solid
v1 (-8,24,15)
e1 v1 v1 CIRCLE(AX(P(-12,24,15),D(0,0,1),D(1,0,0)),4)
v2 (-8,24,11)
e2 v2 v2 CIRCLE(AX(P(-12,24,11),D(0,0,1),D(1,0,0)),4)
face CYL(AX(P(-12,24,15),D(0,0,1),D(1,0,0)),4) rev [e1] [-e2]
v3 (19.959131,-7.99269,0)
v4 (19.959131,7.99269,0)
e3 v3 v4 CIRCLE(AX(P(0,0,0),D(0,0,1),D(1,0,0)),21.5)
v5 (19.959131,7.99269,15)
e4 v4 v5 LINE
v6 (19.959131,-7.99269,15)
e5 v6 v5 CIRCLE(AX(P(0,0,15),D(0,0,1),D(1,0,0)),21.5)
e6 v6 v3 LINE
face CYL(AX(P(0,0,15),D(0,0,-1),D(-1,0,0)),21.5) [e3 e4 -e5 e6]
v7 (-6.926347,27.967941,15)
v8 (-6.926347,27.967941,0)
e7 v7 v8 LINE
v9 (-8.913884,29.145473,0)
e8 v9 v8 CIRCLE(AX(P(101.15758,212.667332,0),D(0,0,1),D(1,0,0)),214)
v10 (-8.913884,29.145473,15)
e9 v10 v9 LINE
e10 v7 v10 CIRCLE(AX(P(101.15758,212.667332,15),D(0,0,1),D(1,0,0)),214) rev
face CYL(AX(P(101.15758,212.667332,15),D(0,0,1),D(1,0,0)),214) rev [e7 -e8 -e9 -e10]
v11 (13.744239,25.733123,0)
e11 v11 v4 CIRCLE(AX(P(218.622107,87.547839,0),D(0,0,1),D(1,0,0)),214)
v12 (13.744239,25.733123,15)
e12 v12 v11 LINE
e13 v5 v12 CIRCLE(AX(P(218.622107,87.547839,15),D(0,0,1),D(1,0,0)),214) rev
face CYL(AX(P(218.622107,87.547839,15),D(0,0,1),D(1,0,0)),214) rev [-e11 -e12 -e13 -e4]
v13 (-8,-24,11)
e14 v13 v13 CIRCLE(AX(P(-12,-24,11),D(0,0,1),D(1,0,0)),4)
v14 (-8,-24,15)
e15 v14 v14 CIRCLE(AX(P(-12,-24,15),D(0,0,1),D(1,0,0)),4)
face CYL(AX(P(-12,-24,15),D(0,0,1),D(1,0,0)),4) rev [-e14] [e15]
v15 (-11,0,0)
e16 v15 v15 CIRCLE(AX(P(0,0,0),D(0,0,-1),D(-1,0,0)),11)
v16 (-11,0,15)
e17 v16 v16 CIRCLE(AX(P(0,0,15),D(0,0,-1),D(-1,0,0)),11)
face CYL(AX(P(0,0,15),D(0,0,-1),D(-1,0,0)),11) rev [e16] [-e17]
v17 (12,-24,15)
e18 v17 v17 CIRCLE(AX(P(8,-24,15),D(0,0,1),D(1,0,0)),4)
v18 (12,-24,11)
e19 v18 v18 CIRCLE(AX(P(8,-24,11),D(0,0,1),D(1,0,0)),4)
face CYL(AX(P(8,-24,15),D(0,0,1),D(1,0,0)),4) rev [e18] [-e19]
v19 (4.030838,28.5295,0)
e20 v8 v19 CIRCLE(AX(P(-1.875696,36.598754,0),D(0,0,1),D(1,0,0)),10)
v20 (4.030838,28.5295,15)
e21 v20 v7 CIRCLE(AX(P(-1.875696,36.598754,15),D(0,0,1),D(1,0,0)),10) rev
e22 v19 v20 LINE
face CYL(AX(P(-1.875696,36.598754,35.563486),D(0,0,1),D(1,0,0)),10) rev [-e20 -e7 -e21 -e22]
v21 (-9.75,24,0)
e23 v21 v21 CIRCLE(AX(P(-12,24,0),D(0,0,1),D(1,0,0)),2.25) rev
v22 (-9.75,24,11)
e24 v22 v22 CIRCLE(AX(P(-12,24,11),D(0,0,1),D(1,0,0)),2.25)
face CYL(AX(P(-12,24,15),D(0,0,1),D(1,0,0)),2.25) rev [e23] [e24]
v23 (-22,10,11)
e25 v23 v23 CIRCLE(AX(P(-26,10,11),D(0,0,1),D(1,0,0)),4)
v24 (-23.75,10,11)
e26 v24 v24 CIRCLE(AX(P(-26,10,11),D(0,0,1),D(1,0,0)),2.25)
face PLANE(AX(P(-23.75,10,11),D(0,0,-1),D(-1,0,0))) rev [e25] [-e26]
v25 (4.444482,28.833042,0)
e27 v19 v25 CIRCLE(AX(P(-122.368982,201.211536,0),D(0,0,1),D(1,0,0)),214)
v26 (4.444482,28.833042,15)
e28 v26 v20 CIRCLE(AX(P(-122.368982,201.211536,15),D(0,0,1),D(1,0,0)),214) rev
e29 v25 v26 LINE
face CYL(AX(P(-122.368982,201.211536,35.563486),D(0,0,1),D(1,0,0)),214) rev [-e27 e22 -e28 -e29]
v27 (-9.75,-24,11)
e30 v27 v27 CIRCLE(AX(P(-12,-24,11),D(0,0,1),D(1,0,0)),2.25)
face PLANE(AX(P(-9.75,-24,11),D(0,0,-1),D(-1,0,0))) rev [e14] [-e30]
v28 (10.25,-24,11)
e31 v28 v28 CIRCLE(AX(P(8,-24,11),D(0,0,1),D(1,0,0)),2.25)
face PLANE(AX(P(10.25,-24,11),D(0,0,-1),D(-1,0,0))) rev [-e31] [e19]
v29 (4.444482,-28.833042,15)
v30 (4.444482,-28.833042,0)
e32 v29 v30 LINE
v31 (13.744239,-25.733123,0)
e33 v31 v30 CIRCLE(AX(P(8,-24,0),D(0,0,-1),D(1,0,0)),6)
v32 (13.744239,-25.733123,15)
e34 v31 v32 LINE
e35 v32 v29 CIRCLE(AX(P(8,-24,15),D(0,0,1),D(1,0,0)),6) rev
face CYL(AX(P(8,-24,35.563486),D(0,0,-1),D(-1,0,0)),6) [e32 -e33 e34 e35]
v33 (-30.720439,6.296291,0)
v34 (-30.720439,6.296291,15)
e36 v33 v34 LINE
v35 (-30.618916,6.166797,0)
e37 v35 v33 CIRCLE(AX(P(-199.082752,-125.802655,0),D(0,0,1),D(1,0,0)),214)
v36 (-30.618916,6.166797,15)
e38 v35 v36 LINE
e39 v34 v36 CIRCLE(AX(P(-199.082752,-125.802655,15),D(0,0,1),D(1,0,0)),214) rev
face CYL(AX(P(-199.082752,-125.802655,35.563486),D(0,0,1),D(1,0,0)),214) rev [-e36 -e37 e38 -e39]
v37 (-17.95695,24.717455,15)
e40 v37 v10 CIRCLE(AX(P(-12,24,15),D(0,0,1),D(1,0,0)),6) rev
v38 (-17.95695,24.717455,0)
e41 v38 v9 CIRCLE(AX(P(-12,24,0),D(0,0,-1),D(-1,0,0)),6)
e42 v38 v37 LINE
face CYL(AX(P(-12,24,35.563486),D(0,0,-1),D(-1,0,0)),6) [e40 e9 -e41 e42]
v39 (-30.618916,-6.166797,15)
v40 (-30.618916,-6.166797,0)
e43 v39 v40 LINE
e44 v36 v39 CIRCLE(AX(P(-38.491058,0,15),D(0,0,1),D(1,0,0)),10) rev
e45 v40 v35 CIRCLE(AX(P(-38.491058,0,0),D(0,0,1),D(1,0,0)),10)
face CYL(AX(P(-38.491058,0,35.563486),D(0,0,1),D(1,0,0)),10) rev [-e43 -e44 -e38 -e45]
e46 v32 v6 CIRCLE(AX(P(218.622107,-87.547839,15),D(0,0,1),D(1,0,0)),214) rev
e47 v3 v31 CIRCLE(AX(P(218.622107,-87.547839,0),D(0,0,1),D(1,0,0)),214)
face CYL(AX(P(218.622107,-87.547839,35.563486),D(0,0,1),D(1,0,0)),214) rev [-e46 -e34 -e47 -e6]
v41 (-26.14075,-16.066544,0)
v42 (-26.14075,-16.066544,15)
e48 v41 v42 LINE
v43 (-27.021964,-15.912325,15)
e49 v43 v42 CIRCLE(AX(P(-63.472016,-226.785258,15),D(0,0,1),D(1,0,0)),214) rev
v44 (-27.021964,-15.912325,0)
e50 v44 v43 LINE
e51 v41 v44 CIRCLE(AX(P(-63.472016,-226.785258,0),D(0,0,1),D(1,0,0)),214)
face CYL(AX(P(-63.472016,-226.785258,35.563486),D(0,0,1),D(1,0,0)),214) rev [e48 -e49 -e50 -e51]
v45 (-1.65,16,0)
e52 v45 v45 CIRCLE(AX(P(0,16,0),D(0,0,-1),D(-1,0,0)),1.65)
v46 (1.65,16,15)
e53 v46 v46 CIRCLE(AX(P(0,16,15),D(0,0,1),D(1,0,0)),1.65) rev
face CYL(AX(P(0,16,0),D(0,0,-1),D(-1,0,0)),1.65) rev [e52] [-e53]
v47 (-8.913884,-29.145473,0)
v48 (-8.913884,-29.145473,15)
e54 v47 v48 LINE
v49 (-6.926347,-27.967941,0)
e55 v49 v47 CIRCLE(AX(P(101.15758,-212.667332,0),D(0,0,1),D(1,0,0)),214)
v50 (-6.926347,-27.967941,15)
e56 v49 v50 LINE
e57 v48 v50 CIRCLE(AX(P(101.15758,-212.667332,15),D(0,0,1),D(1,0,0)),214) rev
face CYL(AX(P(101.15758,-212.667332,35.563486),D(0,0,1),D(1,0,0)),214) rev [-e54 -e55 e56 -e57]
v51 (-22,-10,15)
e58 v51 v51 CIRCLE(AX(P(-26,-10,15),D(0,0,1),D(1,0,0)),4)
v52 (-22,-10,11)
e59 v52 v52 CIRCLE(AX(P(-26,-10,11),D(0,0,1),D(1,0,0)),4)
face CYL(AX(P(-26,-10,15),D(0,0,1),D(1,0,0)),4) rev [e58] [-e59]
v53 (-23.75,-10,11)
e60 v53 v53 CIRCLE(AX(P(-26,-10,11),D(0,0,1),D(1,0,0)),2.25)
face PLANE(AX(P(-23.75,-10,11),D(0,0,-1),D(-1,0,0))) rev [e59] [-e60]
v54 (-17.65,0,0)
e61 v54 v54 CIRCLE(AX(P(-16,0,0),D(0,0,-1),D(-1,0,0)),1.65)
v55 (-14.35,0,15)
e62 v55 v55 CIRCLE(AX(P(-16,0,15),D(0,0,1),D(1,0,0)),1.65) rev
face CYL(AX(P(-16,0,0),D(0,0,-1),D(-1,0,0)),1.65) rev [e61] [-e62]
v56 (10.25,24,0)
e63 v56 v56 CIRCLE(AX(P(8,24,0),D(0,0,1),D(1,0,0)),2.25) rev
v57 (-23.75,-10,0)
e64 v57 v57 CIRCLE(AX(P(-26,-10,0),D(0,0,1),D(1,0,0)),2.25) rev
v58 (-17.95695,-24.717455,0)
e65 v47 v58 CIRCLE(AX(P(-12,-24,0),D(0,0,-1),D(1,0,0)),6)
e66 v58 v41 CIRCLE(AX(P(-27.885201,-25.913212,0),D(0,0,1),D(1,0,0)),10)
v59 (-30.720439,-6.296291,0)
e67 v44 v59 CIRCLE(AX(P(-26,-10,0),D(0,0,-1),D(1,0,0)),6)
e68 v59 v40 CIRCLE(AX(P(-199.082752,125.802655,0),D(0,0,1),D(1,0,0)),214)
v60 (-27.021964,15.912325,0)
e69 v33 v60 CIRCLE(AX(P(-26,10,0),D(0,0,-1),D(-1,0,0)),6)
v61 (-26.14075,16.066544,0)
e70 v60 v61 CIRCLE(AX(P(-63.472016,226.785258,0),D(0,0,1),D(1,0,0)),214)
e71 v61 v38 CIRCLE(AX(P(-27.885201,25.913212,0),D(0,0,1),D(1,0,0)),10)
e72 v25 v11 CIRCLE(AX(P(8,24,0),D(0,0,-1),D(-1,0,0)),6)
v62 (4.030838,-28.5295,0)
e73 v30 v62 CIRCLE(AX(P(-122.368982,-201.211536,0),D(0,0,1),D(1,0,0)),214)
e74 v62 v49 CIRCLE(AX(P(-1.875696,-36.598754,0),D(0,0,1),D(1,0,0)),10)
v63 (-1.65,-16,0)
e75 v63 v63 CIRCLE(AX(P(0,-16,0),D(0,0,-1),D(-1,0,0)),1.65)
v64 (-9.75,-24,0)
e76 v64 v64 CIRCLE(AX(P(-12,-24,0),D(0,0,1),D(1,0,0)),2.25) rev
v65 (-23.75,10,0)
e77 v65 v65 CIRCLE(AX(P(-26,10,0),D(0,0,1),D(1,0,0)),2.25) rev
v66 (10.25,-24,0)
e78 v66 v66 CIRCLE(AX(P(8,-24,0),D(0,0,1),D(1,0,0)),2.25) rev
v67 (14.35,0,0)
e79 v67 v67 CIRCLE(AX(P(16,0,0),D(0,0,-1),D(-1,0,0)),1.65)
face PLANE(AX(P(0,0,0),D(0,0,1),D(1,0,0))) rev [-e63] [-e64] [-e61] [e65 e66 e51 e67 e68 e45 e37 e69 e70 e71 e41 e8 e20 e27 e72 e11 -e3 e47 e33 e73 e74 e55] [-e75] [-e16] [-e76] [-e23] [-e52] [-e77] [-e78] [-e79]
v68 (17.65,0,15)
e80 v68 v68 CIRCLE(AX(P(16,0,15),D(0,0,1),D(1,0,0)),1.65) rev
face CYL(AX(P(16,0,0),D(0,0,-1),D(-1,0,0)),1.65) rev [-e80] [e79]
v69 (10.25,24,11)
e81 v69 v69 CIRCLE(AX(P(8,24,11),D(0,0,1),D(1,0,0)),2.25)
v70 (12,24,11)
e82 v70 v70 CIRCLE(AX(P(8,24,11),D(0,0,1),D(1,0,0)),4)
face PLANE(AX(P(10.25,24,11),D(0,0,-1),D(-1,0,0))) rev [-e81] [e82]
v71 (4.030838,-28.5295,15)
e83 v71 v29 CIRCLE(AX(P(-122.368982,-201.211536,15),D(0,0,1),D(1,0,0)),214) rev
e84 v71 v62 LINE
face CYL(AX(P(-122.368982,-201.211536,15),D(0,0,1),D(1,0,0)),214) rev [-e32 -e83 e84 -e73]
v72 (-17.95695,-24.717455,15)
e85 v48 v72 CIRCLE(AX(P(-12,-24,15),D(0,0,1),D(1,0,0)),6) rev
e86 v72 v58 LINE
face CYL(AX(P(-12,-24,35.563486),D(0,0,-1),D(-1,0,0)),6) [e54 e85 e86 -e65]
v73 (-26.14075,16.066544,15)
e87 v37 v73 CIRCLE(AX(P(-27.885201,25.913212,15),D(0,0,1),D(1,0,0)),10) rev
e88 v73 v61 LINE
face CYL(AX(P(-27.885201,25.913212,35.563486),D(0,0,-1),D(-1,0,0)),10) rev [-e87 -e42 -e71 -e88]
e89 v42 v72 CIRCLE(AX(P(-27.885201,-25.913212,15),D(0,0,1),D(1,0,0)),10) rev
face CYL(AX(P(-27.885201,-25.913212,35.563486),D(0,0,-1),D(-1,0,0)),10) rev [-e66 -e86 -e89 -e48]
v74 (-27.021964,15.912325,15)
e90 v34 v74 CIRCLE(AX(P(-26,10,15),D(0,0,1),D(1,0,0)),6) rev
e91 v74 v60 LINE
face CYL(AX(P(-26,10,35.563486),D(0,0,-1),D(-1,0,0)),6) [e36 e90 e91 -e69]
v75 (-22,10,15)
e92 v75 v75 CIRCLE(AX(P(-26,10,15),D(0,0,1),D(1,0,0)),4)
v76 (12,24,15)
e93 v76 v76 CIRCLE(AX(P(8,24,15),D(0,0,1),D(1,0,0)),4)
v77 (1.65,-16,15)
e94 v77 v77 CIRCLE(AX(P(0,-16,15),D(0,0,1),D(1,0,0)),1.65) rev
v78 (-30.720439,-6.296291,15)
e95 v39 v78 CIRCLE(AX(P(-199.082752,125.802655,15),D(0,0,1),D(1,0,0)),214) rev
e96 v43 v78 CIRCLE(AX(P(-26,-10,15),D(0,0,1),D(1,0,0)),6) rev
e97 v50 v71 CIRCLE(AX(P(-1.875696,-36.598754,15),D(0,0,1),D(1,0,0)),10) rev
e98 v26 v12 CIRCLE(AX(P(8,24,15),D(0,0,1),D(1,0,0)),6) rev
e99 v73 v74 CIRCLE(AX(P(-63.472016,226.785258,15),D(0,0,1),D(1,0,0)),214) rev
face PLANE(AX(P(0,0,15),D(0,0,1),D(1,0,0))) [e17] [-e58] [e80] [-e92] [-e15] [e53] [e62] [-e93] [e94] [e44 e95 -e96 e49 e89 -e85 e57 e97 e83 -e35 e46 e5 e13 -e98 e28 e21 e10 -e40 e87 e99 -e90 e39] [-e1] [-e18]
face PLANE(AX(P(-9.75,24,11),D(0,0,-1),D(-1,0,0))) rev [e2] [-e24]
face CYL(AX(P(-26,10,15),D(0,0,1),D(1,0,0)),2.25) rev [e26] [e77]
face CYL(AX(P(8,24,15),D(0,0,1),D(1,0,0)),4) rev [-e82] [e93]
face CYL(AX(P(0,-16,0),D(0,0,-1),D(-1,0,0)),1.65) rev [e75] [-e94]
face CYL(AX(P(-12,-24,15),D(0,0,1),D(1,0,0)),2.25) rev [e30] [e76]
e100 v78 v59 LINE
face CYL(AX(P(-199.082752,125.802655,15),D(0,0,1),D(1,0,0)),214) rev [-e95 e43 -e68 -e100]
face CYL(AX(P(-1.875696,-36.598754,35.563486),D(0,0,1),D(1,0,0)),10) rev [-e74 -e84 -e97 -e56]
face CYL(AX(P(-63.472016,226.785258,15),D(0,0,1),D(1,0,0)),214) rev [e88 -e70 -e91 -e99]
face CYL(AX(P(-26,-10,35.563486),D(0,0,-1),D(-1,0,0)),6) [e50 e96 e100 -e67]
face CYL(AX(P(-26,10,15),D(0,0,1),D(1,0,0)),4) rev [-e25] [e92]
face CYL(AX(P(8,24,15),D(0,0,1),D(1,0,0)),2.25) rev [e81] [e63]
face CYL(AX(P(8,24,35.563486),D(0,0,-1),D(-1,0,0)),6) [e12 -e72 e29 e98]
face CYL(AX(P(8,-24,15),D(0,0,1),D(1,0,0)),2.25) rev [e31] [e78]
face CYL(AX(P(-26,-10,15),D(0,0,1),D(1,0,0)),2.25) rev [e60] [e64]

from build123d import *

# Parameters (mm, degrees)
SKETCH1_R                      = 21.5
BOSS_EXTRUDE1_DEPTH            = 15
TAP_DRILL_FOR_M4X0_7_TAP1_D    = 3.3
BOSS_EXTRUDE2_DEPTH            = 15
SKETCH6_R                      = 11
CUT_EXTRUDE1_DEPTH             = 47.357307946
FILLET1_DEPTH                  = 15
FILLET2_R                      = 10
CBORE_FOR_M4_SHCS2_D           = 4.5
CBORE_FOR_M4_SHCS2_CBORE_D     = 8
CBORE_FOR_M4_SHCS2_CBORE_DEPTH = 4


with BuildPart() as part:
    # Sketch1 → Boss-Extrude1 (new body)
    with BuildSketch(Plane.XY):
        Circle(SKETCH1_R)
    extrude(amount=BOSS_EXTRUDE1_DEPTH)

    # Tap Drill for M4x0.7 Tap1 (through all)
    with Locations(Plane(origin=(0, 0, 0), x_dir=(-1, 0, 0), z_dir=(0, 0, -1))):
        with Locations((0, 16), (16, 0), (0, -16), (-16, 0)):
            Hole(TAP_DRILL_FOR_M4X0_7_TAP1_D / 2)

    # Sketch3 → Boss-Extrude2 (add)
    with BuildSketch(Plane(origin=(0, 0, 0), x_dir=(-1, 0, 0), z_dir=(0, 0, -1))):
        with BuildLine():
            Line((-2.307900214, 25.897366597), (-0.836682642, 21.483713882))
            ThreePointArc((-0.836682642, 21.483713882), (-6.798896971, 20.396690908), (-12.220882218, 17.688980689))
            Line((-12.220882218, 17.688980689), (-13.69209979, 22.102633403))
            ThreePointArc((-13.69209979, 22.102633403), (-9.897366599, 29.692099788), (-2.307900214, 25.897366597))
        make_face()
        with BuildLine():
            Line((17.366563149, 21.316718426), (14.599655804, 15.782903738))
            ThreePointArc((14.599655804, 15.782903738), (9.615092305, 19.230184606), (3.866529512, 21.149466885))
            Line((3.866529512, 21.149466885), (6.633436857, 26.683281574))
            ThreePointArc((6.633436857, 26.683281574), (14.683281576, 29.366563146), (17.366563149, 21.316718426))
        make_face()
        with BuildLine():
            Line((23.846125524, 15.600073637), (17.115813542, 13.011492105))
            ThreePointArc((17.115813542, 13.011492105), (20.066930533, 7.718050205), (21.423562493, 1.811344831))
            Line((21.423562493, 1.811344831), (28.153874476, 4.399926363))
            ThreePointArc((28.153874476, 4.399926363), (31.600073637, 12.153874476), (23.846125524, 15.600073637))
        make_face()
        with BuildLine():
            Line((23.846125524, -15.600073637), (17.115813542, -13.011492105))
            ThreePointArc((17.115813542, -13.011492105), (20.066930533, -7.718050205), (21.423562493, -1.811344831))
            Line((21.423562493, -1.811344831), (28.153874476, -4.399926363))
            ThreePointArc((28.153874476, -4.399926363), (31.600073637, -12.153874476), (23.846125524, -15.600073637))
        make_face()
        with BuildLine():
            Line((17.366563149, -21.316718426), (14.599655804, -15.782903738))
            ThreePointArc((14.599655804, -15.782903738), (9.615092305, -19.230184606), (3.866529512, -21.149466885))
            Line((3.866529512, -21.149466885), (6.633436857, -26.683281574))
            ThreePointArc((6.633436857, -26.683281574), (14.683281576, -29.366563146), (17.366563149, -21.316718426))
        make_face()
        with BuildLine():
            Line((-2.307900214, -25.897366597), (-0.836682642, -21.483713882))
            ThreePointArc((-0.836682642, -21.483713882), (-6.798896971, -20.396690908), (-12.220882218, -17.688980689))
            Line((-12.220882218, -17.688980689), (-13.69209979, -22.102633403))
            ThreePointArc((-13.69209979, -22.102633403), (-9.897366599, -29.692099788), (-2.307900214, -25.897366597))
        make_face()
    extrude(amount=-BOSS_EXTRUDE2_DEPTH)

    # Sketch6 → Cut-Extrude1 (cut, through all)
    with BuildSketch(Plane(origin=(0, 0, 0), x_dir=(-1, 0, 0), z_dir=(0, 0, -1))):
        Circle(SKETCH6_R)
    extrude(amount=-CUT_EXTRUDE1_DEPTH, mode=Mode.SUBTRACT)

    # Fillet1: read off the stored shape, not the designer's step
    # Fillet1 outline → Fillet1 (add)
    with BuildSketch(Plane.XY):
        with BuildLine():
            ThreePointArc((13.744239295, -25.733122887), (16.656803279, -16.794634864), (19.959130827, -7.9926902))
            ThreePointArc((19.959130827, -7.9926902), (16.804547664, -13.411084139), (12.220882218, -17.688980689))
            Line((12.220882218, -17.688980689), (13.69209979, -22.102633403))
            ThreePointArc((13.69209979, -22.102633403), (13.999381334, -23.913839504), (13.744239295, -25.733122887))
        make_face()
        with BuildLine():
            ThreePointArc((12.220882218, 17.688980689), (16.804547664, 13.411084139), (19.959130827, 7.9926902))
            ThreePointArc((19.959130827, 7.9926902), (16.656803279, 16.794634864), (13.744239295, 25.733122887))
            ThreePointArc((13.744239295, 25.733122887), (13.999381334, 23.913839504), (13.69209979, 22.102633403))
            Line((13.69209979, 22.102633403), (12.220882218, 17.688980689))
        make_face()
        with BuildLine():
            ThreePointArc((-1.269568391, -24.771937297), (1.604087257, -26.779090443), (4.4444823, -28.833041886))
            ThreePointArc((4.4444823, -28.833041886), (3.148798639, -27.530700404), (2.307900214, -25.897366597))
            Line((2.307900214, -25.897366597), (0.836682642, -21.483713882))
            ThreePointArc((0.836682642, -21.483713882), (-1.524113932, -21.445910489), (-3.866529512, -21.149466885))
            Line((-3.866529512, -21.149466885), (-6.633436857, -26.683281574))
            ThreePointArc((-6.633436857, -26.683281574), (-7.59800708, -28.077064913), (-8.913884182, -29.145472684))
            ThreePointArc((-8.913884182, -29.145472684), (-5.114227359, -26.919376327), (-1.269568391, -24.771937297))
        make_face()
        with BuildLine():
            ThreePointArc((2.307900214, 25.897366597), (3.148798639, 27.530700404), (4.4444823, 28.833041886))
            ThreePointArc((4.4444823, 28.833041886), (1.604087257, 26.779090443), (-1.269568391, 24.771937297))
            ThreePointArc((-1.269568391, 24.771937297), (-5.114227359, 26.919376327), (-8.913884182, 29.145472684))
            ThreePointArc((-8.913884182, 29.145472684), (-7.59800708, 28.077064913), (-6.633436857, 26.683281574))
            Line((-6.633436857, 26.683281574), (-3.866529512, 21.149466885))
            ThreePointArc((-3.866529512, 21.149466885), (-1.524113932, 21.445910489), (0.836682642, 21.483713882))
            Line((0.836682642, 21.483713882), (2.307900214, 25.897366597))
        make_face()
        with BuildLine():
            ThreePointArc((-18.827219, -17.493972554), (-18.367768434, -21.052580188), (-17.968047643, -24.618390952))
            ThreePointArc((-17.968047643, -24.618390952), (-17.902847687, -22.924644608), (-17.366563149, -21.316718426))
            Line((-17.366563149, -21.316718426), (-14.599655804, -15.782903738))
            ThreePointArc((-14.599655804, -15.782903738), (-15.918163511, -14.452061114), (-17.115813542, -13.011492105))
            Line((-17.115813542, -13.011492105), (-23.846125524, -15.600073637))
            ThreePointArc((-23.846125524, -15.600073637), (-25.412904992, -15.971207537), (-27.021964079, -15.912325213))
            ThreePointArc((-27.021964079, -15.912325213), (-22.91688029, -16.663195777), (-18.827219, -17.493972554))
        make_face()
        with BuildLine():
            ThreePointArc((-17.366563149, 21.316718426), (-17.902847687, 22.924644608), (-17.968047643, 24.618390952))
            ThreePointArc((-17.968047643, 24.618390952), (-18.367768434, 21.052580188), (-18.827219, 17.493972554))
            ThreePointArc((-18.827219, 17.493972554), (-22.91688029, 16.663195777), (-27.021964079, 15.912325213))
            ThreePointArc((-27.021964079, 15.912325213), (-25.412904992, 15.971207537), (-23.846125524, 15.600073637))
            Line((-23.846125524, 15.600073637), (-17.115813542, 13.011492105))
            ThreePointArc((-17.115813542, 13.011492105), (-15.918163511, 14.452061114), (-14.599655804, 15.782903738))
            Line((-14.599655804, 15.782903738), (-17.366563149, 21.316718426))
        make_face()
        with BuildLine():
            ThreePointArc((-25.965184624, 0), (-28.313790974, -3.170063395), (-30.720438686, -6.296291235))
            ThreePointArc((-30.720438686, -6.296291235), (-29.565542777, -5.174349297), (-28.153874476, -4.399926363))
            Line((-28.153874476, -4.399926363), (-21.423562493, -1.811344831))
            ThreePointArc((-21.423562493, -1.811344831), (-21.5, 0), (-21.423562493, 1.811344831))
            Line((-21.423562493, 1.811344831), (-28.153874476, 4.399926363))
            ThreePointArc((-28.153874476, 4.399926363), (-29.565542777, 5.174349297), (-30.720438686, 6.296291235))
            ThreePointArc((-30.720438686, 6.296291235), (-28.313790974, 3.170063395), (-25.965184624, 0))
        make_face()
    extrude(amount=FILLET1_DEPTH)

    # Fillet2
    fillet2_edges = [part.edges().sort_by_distance(p)[0] for p in [
        (-1.269568391, -24.771937297, 7.5),
        (-18.827219, -17.493972554, 7.5),
        (-25.965184624, 0, 7.5),
        (-18.827219, 17.493972554, 7.5),
        (-1.269568391, 24.771937297, 7.5),
    ]]
    fillet(fillet2_edges, radius=FILLET2_R)

    # CBORE for M4 SHCS2 (through all)
    with Locations(Plane.XY.offset(15)):
        with Locations((8.000000002, 24), (-12.000000003, 24), (-26, 10), (-26, -10), (-12.000000003, -24), (8.000000002, -24)):
            CounterBoreHole(CBORE_FOR_M4_SHCS2_D / 2, CBORE_FOR_M4_SHCS2_CBORE_D / 2, CBORE_FOR_M4_SHCS2_CBORE_DEPTH)


solid = part.part
